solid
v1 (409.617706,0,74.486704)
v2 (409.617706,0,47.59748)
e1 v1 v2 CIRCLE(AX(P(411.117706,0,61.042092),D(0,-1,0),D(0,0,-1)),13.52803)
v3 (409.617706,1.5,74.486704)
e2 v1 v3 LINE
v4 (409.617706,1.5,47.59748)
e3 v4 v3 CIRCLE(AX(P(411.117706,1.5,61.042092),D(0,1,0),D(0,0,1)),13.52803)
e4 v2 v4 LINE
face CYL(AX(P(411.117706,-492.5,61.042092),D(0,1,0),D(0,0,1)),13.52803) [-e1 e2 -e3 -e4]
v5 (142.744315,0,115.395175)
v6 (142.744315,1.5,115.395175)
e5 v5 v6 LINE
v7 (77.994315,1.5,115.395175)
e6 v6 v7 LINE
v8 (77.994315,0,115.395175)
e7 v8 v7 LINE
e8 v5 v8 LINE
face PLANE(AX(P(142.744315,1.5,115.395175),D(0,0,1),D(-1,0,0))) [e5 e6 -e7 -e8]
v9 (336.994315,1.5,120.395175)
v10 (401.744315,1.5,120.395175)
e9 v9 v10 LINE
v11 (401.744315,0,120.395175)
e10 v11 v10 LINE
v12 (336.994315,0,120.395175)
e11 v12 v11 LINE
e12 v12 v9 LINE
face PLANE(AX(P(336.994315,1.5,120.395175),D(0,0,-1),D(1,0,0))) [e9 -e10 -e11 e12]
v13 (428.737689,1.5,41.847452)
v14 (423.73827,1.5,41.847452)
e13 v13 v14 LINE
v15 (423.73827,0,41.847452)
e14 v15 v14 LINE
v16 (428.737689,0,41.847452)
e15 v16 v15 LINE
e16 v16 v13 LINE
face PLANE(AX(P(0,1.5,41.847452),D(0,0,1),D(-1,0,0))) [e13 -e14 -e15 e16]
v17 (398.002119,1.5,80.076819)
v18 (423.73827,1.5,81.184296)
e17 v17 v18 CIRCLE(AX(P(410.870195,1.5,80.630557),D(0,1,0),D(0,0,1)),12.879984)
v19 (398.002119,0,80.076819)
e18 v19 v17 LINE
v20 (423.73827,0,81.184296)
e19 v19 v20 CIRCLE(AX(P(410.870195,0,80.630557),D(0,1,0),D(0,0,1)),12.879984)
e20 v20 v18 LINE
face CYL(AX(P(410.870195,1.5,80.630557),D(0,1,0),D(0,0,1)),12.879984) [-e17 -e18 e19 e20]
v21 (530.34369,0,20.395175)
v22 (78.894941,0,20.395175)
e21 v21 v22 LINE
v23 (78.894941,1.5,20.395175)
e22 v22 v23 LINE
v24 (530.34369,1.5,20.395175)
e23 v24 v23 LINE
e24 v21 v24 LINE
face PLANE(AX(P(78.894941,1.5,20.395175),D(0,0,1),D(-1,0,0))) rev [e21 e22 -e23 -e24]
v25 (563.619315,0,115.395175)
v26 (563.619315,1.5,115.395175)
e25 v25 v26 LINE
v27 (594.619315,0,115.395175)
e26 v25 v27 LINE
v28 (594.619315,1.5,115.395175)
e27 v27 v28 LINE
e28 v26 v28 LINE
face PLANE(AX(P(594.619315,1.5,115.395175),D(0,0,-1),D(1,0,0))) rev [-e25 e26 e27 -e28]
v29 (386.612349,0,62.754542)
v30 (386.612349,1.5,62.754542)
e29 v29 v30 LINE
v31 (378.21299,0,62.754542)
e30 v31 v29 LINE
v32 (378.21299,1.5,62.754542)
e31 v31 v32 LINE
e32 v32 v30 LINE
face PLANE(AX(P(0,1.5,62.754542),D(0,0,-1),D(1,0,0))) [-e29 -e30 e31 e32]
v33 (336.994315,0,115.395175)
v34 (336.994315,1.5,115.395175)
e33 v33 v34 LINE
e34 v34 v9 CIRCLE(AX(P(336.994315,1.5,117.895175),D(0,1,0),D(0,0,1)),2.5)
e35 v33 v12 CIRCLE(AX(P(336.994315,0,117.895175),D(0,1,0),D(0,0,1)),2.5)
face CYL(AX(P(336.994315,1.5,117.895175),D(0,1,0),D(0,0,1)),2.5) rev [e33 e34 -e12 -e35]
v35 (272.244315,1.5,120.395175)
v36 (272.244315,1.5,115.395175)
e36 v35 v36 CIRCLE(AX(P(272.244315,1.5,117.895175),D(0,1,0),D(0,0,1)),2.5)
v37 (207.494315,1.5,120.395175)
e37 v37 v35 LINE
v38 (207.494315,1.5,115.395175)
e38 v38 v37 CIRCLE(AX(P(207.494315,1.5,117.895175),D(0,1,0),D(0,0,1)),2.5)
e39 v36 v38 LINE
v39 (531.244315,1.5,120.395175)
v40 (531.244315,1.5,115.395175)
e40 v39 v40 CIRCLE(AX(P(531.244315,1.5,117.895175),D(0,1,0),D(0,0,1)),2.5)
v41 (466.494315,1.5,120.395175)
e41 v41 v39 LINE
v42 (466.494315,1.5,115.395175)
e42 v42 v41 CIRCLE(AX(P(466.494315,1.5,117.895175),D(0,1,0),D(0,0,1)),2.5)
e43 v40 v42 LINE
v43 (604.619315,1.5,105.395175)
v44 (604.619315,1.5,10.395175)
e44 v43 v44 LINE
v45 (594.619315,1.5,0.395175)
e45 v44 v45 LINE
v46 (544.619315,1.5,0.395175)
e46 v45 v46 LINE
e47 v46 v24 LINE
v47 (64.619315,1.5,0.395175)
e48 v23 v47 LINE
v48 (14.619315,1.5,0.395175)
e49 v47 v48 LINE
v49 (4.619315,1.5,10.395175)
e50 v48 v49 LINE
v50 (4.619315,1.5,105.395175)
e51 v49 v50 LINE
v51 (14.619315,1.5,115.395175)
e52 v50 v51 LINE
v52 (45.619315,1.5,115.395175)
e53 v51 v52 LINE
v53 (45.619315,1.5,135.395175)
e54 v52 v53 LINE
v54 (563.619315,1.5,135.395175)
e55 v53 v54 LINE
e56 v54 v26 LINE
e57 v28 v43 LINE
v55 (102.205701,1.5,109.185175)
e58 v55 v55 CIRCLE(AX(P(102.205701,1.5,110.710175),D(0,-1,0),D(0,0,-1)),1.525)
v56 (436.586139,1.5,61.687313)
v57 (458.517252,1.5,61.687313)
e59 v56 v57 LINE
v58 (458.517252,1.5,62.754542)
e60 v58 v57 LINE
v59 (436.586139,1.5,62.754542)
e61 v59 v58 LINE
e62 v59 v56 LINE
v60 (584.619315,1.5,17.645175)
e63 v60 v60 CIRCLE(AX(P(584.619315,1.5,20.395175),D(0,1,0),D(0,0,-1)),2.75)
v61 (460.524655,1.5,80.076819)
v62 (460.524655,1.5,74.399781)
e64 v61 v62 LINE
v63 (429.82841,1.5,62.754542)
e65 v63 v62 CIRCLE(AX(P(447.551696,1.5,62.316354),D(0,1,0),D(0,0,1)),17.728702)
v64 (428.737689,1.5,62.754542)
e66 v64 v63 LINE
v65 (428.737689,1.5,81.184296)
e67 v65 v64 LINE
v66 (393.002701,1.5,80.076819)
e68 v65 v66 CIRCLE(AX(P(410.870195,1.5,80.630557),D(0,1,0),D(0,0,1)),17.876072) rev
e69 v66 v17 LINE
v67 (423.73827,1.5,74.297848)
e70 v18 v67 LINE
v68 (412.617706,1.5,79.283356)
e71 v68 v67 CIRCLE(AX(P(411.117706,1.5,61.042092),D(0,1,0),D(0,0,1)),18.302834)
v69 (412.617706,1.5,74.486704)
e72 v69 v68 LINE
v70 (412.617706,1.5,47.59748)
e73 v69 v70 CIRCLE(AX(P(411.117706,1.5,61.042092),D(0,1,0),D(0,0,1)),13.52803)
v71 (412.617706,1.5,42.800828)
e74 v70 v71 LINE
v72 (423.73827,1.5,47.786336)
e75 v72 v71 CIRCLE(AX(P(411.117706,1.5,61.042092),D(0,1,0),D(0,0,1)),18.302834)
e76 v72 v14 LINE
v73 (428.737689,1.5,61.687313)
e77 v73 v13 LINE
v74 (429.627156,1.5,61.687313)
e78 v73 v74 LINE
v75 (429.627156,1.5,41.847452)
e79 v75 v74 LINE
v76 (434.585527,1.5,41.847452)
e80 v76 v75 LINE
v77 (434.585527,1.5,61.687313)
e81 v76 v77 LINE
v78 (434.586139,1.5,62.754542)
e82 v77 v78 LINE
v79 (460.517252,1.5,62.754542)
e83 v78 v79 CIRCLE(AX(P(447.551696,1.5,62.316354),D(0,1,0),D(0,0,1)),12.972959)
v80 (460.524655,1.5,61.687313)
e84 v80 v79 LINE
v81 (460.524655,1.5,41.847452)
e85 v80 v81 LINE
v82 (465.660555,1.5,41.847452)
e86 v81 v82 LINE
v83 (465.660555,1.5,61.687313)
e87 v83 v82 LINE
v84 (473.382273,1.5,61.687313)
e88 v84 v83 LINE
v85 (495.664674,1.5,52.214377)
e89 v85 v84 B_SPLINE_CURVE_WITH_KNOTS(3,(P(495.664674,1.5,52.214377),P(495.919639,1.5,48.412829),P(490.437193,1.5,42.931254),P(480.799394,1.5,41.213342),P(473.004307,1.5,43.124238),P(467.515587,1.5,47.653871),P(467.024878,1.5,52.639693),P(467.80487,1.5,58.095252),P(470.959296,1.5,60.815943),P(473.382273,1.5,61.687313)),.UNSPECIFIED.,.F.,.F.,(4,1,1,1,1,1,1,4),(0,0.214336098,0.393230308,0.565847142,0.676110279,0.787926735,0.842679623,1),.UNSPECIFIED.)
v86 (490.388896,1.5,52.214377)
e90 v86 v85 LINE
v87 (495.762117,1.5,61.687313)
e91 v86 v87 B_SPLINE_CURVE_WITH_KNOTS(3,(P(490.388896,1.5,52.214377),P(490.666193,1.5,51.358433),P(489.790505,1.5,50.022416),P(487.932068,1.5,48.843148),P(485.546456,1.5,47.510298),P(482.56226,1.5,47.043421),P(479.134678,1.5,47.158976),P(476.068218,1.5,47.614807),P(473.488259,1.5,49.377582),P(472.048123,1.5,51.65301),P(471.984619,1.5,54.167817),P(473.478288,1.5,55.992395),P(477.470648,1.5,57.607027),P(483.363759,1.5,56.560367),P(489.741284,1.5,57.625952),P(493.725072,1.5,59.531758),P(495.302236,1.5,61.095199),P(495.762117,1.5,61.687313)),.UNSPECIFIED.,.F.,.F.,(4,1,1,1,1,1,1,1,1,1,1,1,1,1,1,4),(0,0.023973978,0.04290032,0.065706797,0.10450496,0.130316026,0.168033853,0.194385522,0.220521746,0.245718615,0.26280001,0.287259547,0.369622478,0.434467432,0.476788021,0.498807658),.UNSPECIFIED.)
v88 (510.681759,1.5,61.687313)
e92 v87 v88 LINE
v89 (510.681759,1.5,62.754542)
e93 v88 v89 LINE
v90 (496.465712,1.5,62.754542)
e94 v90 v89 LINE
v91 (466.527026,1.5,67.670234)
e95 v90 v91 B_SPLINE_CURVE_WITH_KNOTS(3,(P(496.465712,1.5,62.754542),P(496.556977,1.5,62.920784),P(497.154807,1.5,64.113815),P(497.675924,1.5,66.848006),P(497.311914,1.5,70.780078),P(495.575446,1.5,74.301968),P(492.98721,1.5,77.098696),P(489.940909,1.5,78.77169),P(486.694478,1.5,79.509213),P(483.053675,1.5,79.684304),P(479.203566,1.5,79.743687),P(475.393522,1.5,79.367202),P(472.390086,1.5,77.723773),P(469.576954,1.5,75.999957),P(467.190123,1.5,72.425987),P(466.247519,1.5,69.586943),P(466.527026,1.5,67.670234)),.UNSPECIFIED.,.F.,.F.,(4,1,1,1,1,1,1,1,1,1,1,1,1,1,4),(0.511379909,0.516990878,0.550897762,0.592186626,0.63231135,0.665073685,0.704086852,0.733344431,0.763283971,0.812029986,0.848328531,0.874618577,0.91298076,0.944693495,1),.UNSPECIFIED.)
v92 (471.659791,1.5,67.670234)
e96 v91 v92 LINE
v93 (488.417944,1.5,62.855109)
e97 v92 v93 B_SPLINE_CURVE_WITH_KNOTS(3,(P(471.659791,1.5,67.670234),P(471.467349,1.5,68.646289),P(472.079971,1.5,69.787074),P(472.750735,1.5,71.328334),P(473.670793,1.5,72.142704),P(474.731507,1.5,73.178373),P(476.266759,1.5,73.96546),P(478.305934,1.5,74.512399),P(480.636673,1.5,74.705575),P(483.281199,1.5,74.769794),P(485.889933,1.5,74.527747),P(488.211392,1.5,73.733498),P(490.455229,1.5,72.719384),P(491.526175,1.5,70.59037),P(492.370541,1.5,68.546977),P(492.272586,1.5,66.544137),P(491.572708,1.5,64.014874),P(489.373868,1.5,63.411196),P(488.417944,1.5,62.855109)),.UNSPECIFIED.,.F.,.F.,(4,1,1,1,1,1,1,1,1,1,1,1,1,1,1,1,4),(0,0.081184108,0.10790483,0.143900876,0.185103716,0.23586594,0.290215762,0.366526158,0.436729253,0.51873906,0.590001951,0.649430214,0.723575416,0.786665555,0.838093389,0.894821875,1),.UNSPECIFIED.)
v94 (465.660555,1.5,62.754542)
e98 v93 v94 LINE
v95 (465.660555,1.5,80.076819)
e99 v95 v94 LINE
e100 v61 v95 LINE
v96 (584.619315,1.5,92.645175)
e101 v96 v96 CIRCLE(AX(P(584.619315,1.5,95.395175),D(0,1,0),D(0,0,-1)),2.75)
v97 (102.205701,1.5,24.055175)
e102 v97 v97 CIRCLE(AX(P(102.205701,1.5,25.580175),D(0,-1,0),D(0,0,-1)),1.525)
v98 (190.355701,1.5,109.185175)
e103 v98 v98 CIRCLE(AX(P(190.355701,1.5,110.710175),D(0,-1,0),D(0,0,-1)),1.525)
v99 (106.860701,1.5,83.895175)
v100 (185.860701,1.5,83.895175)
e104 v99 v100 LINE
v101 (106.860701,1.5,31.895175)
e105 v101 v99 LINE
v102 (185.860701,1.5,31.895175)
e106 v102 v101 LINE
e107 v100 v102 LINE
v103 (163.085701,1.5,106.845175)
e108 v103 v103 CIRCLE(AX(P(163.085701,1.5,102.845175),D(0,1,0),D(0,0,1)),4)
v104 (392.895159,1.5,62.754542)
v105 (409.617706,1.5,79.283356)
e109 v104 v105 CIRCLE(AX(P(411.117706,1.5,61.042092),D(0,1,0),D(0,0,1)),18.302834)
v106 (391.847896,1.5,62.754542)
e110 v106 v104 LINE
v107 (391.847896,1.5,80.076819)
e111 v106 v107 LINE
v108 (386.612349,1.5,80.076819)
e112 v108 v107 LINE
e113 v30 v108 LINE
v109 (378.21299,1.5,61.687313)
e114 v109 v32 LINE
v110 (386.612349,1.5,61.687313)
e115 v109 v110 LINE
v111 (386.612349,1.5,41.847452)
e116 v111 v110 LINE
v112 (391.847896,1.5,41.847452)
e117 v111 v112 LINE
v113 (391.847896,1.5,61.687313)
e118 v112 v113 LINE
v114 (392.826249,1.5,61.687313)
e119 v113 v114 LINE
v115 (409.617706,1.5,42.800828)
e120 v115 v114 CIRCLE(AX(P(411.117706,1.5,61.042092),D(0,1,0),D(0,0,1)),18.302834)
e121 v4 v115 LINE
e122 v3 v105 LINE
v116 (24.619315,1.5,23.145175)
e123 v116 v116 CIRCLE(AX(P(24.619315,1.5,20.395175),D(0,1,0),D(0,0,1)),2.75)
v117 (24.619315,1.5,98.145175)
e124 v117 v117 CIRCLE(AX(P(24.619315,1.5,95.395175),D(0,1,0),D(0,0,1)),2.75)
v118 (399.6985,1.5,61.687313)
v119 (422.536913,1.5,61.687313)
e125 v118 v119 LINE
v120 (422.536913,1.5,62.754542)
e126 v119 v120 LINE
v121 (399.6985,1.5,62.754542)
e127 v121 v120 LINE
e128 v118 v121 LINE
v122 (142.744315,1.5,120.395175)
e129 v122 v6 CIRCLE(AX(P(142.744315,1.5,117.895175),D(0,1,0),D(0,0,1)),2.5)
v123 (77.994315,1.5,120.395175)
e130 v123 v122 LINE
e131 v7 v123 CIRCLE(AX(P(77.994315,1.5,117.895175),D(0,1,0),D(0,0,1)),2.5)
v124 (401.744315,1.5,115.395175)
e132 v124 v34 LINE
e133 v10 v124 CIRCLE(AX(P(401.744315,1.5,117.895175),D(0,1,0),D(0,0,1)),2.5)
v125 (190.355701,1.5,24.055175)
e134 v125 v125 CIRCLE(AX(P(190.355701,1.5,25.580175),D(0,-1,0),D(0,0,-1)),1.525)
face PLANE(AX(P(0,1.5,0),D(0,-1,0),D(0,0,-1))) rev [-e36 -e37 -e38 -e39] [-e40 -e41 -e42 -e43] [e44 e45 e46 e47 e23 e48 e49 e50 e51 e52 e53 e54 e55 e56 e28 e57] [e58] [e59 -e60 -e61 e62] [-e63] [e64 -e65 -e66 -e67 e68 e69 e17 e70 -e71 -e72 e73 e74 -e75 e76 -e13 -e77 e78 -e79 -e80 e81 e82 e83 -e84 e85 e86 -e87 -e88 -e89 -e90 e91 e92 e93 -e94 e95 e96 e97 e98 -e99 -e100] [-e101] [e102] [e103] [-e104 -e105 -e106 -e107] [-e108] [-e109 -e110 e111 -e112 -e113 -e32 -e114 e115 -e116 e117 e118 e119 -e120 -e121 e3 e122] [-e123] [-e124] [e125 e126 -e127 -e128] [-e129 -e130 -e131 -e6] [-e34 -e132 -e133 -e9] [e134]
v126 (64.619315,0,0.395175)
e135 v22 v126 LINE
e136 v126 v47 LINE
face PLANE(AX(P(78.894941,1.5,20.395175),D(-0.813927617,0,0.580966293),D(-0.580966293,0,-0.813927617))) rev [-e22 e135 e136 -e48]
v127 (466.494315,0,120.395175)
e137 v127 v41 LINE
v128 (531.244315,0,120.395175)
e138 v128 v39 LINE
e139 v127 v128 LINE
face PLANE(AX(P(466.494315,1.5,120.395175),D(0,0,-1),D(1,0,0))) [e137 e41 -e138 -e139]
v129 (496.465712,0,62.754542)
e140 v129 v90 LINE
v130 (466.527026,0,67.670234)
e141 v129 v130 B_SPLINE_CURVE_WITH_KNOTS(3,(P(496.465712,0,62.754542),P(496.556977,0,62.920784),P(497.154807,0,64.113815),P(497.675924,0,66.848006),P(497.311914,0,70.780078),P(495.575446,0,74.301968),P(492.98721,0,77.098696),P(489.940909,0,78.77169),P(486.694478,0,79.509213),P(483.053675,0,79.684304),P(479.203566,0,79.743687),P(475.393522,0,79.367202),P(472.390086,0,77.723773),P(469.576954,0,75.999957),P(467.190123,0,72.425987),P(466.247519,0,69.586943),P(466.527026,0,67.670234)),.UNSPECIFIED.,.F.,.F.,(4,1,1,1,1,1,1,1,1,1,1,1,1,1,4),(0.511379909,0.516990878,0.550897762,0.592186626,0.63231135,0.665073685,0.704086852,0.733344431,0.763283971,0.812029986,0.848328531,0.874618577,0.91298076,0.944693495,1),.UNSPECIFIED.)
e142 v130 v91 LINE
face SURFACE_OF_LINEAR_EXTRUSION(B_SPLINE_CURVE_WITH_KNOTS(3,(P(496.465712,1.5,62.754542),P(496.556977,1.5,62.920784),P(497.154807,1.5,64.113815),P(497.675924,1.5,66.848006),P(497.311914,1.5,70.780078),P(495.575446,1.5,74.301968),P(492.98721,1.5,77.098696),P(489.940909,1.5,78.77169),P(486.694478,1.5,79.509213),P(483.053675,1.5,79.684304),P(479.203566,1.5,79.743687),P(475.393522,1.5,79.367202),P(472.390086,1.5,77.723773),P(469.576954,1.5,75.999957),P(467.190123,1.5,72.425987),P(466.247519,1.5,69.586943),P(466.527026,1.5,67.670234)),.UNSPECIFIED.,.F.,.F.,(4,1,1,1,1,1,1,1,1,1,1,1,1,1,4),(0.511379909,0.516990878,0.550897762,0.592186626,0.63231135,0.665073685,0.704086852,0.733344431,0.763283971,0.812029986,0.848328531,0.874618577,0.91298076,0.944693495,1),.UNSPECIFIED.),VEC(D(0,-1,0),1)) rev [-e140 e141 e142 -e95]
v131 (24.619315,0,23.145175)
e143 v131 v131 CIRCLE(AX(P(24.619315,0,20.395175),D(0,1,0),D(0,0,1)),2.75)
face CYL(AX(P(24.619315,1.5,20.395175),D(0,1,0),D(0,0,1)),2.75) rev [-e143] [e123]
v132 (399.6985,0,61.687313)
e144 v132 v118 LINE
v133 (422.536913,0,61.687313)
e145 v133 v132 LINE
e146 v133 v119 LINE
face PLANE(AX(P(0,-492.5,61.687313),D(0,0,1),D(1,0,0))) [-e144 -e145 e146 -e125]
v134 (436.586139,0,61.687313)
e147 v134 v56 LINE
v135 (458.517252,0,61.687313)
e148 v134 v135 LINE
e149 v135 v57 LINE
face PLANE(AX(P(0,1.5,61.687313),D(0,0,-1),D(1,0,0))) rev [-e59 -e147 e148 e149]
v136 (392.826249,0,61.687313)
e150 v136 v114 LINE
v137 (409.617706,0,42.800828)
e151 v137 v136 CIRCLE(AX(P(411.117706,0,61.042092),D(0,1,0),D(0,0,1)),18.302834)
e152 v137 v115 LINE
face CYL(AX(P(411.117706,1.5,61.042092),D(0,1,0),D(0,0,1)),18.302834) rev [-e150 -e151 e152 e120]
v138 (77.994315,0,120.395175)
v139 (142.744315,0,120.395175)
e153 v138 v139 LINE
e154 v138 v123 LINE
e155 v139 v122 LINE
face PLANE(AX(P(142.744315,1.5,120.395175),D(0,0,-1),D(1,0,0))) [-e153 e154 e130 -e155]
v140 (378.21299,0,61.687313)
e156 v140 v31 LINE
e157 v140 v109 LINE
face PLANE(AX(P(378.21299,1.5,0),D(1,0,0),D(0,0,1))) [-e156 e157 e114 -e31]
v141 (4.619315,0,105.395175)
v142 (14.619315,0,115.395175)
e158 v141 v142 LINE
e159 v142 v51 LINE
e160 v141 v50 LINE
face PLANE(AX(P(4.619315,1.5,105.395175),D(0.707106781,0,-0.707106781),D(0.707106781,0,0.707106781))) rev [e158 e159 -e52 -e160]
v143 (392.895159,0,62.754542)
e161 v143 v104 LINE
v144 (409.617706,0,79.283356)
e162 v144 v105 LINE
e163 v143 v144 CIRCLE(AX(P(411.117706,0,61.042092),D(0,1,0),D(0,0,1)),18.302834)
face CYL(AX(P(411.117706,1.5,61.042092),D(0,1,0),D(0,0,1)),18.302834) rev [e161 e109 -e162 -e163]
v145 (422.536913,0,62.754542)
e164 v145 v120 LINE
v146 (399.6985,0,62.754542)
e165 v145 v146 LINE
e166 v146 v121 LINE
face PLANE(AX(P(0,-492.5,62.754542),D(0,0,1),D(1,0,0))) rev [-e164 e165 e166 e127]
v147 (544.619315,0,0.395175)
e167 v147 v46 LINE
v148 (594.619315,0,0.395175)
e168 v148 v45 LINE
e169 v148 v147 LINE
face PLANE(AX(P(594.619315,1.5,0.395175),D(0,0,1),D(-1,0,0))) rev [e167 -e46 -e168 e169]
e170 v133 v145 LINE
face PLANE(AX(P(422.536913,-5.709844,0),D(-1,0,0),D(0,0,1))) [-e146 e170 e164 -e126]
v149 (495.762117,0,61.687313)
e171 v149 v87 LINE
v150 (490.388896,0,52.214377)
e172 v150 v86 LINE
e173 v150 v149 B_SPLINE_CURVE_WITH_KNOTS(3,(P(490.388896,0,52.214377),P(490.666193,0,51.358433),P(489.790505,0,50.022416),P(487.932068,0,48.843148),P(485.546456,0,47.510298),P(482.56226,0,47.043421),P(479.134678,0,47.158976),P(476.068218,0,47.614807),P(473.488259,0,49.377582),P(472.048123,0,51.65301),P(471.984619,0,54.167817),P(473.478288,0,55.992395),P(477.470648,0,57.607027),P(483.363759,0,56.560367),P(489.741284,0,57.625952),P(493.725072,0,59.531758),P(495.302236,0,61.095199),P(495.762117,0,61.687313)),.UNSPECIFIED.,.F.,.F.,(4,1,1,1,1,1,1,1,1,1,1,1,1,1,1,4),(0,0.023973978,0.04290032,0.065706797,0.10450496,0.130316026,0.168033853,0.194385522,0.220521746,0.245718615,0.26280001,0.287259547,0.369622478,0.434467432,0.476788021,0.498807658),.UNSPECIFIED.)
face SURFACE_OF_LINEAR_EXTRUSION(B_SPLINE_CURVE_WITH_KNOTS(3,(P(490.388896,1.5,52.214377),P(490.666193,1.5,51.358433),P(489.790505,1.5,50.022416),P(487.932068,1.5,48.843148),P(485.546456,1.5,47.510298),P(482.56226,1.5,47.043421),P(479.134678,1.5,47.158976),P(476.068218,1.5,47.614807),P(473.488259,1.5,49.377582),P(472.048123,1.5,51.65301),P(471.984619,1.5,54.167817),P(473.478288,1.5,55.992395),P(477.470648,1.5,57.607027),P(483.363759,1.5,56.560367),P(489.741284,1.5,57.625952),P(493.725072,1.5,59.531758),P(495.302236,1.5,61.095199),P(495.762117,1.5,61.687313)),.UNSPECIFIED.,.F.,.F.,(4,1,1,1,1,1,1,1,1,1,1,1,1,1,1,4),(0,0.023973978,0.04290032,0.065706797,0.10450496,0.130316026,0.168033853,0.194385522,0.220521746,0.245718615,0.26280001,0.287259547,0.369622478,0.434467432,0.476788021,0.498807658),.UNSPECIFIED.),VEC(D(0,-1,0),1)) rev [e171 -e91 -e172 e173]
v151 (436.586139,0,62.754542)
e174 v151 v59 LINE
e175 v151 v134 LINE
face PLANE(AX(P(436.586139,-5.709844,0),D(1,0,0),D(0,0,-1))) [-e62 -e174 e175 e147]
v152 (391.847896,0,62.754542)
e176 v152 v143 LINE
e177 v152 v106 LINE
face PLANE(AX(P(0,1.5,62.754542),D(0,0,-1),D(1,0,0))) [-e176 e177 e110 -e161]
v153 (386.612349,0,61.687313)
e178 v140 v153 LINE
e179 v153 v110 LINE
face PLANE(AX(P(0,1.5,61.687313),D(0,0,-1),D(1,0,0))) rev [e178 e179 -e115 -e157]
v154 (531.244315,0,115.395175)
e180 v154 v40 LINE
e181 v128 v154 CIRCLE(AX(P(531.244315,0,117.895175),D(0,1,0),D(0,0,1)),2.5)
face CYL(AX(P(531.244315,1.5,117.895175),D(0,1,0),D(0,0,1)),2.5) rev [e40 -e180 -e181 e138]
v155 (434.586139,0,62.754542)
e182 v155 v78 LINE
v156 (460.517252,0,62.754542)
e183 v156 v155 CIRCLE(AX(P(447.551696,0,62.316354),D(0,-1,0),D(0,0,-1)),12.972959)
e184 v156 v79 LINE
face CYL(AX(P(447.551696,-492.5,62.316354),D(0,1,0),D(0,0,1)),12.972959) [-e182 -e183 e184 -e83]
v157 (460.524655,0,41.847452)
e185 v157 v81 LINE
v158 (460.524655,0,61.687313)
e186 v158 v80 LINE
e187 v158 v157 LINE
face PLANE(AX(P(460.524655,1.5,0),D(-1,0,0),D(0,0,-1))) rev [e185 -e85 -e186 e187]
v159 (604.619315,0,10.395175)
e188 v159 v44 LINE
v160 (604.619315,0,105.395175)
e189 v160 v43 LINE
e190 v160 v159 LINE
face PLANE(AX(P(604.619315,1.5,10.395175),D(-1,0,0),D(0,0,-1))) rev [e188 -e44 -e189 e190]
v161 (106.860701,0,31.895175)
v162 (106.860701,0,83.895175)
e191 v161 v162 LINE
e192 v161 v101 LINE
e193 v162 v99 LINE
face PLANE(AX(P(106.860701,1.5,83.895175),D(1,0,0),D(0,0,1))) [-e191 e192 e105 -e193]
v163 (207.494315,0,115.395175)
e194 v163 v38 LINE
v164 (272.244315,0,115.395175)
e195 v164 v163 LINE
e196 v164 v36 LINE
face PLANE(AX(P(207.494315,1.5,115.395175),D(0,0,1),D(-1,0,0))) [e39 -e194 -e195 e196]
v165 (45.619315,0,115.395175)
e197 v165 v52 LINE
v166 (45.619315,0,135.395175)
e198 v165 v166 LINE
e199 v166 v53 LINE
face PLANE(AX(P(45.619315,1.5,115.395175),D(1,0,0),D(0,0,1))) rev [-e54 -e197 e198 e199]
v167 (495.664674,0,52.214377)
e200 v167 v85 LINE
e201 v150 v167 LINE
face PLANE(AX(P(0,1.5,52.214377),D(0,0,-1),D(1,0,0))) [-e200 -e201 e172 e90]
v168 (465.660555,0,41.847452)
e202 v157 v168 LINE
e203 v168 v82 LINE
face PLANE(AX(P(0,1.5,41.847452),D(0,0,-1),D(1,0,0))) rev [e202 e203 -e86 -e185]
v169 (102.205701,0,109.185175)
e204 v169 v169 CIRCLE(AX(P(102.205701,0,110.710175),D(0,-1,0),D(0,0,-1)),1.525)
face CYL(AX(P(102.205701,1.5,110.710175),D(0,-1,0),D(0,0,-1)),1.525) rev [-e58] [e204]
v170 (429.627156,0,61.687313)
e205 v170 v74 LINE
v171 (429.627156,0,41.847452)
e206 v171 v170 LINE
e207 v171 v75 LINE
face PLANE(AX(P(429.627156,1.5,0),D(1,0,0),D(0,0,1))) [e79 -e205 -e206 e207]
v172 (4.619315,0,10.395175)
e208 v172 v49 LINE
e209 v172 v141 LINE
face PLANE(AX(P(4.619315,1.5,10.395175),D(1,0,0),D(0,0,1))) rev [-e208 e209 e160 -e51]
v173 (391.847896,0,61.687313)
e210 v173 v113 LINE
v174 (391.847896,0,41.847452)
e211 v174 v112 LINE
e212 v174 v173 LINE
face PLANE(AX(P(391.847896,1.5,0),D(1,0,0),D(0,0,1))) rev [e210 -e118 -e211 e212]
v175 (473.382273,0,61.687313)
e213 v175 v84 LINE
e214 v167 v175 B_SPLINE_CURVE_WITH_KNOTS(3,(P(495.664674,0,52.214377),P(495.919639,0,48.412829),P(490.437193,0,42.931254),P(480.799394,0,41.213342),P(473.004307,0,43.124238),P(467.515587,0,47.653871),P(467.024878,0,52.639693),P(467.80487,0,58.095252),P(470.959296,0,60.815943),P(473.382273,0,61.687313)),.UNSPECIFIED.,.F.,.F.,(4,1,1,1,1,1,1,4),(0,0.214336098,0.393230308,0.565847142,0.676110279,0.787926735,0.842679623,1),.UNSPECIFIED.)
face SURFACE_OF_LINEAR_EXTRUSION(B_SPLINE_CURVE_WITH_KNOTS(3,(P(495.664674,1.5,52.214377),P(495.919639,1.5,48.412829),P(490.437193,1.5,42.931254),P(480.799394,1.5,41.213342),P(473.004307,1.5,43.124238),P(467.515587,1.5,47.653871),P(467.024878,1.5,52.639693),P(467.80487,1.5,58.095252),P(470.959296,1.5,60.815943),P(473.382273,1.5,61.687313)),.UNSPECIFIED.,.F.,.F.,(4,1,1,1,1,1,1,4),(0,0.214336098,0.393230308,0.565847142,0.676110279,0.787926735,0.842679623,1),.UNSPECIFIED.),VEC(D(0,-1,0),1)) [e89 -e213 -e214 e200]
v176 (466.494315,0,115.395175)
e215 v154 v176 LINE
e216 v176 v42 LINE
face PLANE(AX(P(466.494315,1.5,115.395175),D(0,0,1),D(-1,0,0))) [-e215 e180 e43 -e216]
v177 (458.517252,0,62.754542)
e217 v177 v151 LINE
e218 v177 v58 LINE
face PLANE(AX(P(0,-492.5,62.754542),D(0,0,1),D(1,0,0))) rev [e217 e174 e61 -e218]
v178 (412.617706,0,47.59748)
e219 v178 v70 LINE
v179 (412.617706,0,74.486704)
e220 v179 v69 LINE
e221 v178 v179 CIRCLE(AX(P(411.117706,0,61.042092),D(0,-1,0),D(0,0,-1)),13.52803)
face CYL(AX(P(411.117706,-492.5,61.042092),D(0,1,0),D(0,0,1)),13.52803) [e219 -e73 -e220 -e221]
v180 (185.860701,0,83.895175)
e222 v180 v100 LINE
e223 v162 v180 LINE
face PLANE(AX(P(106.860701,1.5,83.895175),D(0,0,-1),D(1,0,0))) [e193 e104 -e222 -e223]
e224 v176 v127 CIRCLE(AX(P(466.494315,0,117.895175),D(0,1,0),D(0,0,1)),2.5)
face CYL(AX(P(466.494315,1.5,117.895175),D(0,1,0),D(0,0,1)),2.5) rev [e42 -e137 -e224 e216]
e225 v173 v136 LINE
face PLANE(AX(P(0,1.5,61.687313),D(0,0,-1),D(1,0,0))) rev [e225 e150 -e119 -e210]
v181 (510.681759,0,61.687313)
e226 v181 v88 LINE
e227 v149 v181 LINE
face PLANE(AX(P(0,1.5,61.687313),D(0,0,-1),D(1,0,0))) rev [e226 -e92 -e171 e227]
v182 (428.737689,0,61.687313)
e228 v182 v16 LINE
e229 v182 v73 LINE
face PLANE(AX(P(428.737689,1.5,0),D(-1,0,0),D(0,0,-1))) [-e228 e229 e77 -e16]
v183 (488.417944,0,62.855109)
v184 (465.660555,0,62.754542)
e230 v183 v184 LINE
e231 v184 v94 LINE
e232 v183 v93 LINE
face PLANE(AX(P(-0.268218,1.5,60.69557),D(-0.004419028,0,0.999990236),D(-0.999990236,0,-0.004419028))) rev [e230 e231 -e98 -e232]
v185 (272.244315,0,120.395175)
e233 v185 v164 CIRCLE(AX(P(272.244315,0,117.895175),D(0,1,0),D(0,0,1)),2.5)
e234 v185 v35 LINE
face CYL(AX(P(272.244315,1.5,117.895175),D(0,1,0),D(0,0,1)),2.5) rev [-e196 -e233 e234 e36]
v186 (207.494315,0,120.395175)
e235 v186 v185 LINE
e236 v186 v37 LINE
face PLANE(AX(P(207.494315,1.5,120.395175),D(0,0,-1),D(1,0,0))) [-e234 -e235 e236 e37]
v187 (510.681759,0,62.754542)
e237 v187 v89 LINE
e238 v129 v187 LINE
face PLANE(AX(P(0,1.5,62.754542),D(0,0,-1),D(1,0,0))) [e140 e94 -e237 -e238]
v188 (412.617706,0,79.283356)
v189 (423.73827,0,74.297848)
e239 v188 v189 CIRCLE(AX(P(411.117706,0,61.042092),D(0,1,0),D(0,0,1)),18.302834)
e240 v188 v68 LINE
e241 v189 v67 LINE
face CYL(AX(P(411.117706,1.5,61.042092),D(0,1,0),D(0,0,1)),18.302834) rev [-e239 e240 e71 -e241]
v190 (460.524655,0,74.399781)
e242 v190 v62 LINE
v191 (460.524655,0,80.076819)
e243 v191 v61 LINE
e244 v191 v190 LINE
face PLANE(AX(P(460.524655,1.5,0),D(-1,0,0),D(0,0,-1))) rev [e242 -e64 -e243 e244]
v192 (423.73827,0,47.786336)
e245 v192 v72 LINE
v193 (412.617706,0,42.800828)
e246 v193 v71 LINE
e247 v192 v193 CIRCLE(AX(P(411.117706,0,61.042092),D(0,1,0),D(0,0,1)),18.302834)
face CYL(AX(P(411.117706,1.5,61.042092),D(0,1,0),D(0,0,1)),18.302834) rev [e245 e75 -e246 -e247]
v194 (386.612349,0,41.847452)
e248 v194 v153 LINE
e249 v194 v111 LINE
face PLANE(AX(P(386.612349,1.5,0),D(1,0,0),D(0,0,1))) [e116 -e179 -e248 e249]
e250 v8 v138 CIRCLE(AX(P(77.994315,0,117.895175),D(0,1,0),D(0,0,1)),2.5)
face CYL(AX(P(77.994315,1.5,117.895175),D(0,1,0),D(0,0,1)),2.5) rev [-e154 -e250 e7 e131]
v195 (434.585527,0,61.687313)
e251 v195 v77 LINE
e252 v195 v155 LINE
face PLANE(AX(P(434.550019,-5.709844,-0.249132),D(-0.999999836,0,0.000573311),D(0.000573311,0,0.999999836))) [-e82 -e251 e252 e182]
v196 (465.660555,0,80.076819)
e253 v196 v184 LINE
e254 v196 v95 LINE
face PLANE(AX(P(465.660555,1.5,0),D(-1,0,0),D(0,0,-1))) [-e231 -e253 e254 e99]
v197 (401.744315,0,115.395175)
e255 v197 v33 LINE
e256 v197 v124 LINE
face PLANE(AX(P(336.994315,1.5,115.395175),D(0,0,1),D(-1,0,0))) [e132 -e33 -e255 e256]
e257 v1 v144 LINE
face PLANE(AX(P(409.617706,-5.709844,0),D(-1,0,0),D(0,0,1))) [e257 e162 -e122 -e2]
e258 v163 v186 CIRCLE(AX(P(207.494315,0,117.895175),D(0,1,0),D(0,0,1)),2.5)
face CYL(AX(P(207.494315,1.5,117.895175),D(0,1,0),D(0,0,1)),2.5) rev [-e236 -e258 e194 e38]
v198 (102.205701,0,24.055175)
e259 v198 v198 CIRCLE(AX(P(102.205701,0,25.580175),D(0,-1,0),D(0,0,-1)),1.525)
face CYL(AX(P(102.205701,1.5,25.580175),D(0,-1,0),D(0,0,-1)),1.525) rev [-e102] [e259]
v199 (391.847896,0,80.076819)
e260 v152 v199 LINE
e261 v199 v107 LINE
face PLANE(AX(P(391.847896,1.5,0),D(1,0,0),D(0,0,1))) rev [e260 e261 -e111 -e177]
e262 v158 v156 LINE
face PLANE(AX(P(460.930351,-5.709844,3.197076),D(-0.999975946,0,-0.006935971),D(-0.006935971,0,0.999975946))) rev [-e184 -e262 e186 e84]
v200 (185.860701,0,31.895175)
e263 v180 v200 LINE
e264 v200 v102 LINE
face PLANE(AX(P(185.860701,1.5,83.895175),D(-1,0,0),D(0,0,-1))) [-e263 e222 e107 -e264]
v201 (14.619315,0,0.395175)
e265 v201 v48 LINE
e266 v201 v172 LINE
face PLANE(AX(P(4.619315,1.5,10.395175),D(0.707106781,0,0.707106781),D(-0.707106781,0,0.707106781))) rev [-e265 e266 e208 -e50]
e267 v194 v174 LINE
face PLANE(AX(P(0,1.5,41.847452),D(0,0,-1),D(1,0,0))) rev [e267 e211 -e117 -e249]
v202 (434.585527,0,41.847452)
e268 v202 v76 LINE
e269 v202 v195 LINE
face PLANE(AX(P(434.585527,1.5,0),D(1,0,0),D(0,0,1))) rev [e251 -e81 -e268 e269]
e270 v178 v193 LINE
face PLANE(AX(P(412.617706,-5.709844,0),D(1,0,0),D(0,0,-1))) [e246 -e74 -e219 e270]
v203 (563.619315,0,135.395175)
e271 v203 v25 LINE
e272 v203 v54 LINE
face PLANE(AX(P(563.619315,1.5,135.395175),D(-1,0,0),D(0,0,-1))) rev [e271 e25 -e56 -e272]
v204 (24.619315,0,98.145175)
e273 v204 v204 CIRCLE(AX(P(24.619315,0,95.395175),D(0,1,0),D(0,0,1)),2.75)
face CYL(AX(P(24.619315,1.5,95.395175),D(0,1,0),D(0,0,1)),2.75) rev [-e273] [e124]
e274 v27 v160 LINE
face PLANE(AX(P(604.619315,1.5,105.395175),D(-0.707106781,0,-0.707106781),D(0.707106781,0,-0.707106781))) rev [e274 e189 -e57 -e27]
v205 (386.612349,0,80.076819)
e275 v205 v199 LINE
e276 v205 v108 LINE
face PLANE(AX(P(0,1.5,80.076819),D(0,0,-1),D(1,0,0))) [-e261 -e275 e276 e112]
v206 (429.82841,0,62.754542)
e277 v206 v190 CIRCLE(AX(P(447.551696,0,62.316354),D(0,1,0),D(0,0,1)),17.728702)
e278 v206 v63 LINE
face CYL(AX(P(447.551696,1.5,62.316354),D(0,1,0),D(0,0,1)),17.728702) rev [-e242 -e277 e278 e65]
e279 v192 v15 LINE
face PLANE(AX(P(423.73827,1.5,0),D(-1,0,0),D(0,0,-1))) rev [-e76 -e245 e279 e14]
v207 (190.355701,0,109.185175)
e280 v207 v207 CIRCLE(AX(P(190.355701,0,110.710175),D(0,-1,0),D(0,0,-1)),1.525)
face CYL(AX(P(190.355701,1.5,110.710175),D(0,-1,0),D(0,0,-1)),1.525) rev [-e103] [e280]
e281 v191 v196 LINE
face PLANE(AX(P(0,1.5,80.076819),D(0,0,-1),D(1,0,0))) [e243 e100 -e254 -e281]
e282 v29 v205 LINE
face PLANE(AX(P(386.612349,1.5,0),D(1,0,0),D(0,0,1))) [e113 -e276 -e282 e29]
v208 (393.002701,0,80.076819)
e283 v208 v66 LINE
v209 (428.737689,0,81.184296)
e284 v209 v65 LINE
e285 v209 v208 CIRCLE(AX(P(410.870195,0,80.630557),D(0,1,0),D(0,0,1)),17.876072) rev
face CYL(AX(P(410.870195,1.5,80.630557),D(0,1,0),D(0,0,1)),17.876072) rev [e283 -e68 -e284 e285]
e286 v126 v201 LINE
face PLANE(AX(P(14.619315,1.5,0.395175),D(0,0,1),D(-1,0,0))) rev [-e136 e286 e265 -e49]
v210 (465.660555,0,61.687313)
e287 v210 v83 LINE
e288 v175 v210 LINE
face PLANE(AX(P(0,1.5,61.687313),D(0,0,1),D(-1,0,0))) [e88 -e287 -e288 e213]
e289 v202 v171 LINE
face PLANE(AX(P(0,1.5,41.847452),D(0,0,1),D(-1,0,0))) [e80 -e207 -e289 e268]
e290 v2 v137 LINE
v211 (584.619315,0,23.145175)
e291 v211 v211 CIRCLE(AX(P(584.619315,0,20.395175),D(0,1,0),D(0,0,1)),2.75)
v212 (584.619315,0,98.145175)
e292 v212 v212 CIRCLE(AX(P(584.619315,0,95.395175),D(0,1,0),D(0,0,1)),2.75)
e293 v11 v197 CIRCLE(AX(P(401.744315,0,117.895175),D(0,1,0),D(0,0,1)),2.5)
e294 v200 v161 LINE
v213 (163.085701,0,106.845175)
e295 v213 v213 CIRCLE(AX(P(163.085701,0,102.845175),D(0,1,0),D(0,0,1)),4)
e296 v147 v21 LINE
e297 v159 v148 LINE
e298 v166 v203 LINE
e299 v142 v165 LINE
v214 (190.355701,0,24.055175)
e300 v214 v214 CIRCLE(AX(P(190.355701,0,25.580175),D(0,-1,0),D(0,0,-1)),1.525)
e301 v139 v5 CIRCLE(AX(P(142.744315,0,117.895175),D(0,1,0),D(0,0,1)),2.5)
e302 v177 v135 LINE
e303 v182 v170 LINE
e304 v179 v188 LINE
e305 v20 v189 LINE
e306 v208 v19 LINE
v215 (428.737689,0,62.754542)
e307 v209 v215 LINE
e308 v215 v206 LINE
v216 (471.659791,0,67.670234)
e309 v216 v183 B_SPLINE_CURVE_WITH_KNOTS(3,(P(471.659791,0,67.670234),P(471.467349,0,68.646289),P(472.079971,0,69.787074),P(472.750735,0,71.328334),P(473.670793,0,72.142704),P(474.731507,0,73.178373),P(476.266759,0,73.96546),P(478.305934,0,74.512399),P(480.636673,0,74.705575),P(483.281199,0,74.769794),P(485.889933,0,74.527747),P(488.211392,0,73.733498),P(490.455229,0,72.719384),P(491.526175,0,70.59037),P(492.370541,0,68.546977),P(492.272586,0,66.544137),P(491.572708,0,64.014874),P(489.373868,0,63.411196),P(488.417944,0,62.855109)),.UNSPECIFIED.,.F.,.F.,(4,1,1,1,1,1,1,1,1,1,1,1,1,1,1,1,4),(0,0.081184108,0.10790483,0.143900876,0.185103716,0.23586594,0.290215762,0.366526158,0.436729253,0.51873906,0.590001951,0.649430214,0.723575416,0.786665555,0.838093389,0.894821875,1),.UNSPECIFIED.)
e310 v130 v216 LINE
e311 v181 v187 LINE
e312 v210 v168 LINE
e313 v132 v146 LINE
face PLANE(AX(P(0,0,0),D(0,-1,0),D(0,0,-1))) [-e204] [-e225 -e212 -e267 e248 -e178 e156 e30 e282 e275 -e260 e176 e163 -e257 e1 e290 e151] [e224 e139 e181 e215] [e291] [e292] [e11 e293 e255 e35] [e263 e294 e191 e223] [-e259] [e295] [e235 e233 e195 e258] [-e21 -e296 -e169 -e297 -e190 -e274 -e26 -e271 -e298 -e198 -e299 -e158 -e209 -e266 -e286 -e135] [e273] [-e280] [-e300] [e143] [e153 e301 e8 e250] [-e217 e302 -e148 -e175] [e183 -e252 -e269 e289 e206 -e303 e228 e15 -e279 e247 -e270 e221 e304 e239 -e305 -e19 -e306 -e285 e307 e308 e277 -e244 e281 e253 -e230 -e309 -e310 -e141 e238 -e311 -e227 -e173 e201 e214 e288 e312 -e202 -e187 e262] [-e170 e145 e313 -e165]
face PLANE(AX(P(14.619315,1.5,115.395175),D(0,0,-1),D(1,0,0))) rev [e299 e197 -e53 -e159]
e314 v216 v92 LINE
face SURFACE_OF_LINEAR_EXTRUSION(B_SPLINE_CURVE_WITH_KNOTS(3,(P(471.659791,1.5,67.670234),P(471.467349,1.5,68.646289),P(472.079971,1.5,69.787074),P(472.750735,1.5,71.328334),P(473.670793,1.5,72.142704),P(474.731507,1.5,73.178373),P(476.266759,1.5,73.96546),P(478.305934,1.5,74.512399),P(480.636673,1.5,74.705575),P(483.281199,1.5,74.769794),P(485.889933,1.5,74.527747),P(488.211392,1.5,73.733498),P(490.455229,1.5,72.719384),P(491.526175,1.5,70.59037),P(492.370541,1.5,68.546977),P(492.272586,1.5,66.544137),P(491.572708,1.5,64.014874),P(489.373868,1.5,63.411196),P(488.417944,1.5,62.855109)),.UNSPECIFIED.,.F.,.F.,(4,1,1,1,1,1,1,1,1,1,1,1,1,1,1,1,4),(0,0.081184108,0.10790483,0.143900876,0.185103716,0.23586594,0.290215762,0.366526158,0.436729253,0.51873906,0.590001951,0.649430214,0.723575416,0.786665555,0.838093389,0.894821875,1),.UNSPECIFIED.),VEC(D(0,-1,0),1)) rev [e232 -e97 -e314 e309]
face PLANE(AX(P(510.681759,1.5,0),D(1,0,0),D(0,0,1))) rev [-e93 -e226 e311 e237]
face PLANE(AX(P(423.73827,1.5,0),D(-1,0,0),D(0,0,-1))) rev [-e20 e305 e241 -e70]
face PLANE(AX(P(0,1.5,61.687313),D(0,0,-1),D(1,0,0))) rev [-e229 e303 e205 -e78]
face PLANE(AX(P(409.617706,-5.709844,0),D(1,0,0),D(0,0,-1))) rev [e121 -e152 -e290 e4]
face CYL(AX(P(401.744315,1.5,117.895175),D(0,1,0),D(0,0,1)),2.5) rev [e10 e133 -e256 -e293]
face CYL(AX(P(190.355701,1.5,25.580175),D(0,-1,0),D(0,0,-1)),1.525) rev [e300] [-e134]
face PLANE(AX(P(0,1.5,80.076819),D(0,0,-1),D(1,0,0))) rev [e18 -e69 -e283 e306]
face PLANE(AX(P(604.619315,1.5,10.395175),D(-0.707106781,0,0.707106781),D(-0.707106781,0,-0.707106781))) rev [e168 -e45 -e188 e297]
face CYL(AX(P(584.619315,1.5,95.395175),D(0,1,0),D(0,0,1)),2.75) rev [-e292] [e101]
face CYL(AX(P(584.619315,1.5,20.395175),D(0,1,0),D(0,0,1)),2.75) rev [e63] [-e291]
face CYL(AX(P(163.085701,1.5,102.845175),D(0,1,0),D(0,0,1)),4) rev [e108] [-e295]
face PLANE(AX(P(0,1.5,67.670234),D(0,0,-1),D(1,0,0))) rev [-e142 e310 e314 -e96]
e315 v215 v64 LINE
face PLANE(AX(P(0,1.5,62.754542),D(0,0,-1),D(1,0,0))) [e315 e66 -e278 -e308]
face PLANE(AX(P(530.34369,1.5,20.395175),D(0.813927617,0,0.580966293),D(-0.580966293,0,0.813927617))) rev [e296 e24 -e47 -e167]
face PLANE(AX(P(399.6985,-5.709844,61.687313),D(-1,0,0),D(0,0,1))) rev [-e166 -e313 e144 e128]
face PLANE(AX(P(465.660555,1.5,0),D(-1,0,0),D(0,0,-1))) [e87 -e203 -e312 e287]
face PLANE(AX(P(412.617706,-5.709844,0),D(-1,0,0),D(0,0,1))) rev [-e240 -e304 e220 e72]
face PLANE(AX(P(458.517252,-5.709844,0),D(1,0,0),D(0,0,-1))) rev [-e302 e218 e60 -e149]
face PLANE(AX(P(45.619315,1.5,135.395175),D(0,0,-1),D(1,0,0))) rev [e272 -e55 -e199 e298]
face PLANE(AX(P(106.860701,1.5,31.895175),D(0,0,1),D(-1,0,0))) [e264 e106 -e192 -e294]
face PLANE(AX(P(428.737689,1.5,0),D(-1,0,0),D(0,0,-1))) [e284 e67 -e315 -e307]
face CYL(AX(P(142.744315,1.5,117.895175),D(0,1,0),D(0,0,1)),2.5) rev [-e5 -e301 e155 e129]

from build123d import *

# Parameters (mm, degrees)
SKETCH1_R           = 2.75
BOSS_EXTRUDE1_DEPTH = 1.5
CUT_EXTRUDE1_DEPTH  = 494
SKETCH3_W           = 79
SKETCH3_H           = 52
CUT_EXTRUDE2_DEPTH  = 10
SKETCH7_R           = 4
CUT_EXTRUDE4_DEPTH  = 10
SKETCH8_R           = 1.525
CUT_EXTRUDE5_DEPTH  = 10
BOSS_EXTRUDE2_DEPTH = 1.5


with BuildPart() as part:
    # Sketch1 → Boss-Extrude1 (new body)
    with BuildSketch(Plane(origin=(0, 0, 0), x_dir=(1, 0, 0), z_dir=(0, 1, 0))):
        Polygon((14.619315376, -0.395174927), (64.619315376, -0.395174927), (78.894940901, -20.395174927), (530.343689851, -20.395174927), (544.619315376, -0.395174927), (594.619315376, -0.395174927), (604.619315376, -10.395174927), (604.619315376, -105.395174927), (594.619315376, -115.395174927), (563.619315376, -115.395174927), (563.619315376, -135.395174927), (45.619315376, -135.395174927), (45.619315376, -115.395174927), (14.619315376, -115.395174927), (4.619315376, -105.395174927), (4.619315376, -10.395174927), align=None)
        with Locations(Location((24.619315376, -20.395174927, 0), (0, 0, 270))):
            Circle(SKETCH1_R, mode=Mode.SUBTRACT)
        with Locations(Location((24.619315376, -95.395174927, 0), (0, 0, 270))):
            Circle(SKETCH1_R, mode=Mode.SUBTRACT)
        with Locations(Location((584.619315376, -95.395174927, 0), (0, 0, 90))):
            Circle(SKETCH1_R, mode=Mode.SUBTRACT)
        with Locations(Location((584.619315376, -20.395174927, 0), (0, 0, 90))):
            Circle(SKETCH1_R, mode=Mode.SUBTRACT)
        with BuildLine():
            Line((142.744315376, -120.395174927), (77.994315376, -120.395174927))
            ThreePointArc((77.994315376, -120.395174927), (75.494315376, -117.895174927), (77.994315376, -115.395174927))
            Line((77.994315376, -115.395174927), (142.744315376, -115.395174927))
            ThreePointArc((142.744315376, -115.395174927), (145.244315376, -117.895174927), (142.744315376, -120.395174927))
        make_face(mode=Mode.SUBTRACT)
        with BuildLine():
            Line((466.494315376, -115.395174927), (531.244315376, -115.395174927))
            ThreePointArc((531.244315376, -115.395174927), (533.744315376, -117.895174927), (531.244315376, -120.395174927))
            Line((531.244315376, -120.395174927), (466.494315376, -120.395174927))
            ThreePointArc((466.494315376, -120.395174927), (463.994315376, -117.895174927), (466.494315376, -115.395174927))
        make_face(mode=Mode.SUBTRACT)
        with BuildLine():
            Line((336.994315376, -115.395174927), (401.744315376, -115.395174927))
            ThreePointArc((401.744315376, -115.395174927), (404.244315376, -117.895174927), (401.744315376, -120.395174927))
            Line((401.744315376, -120.395174927), (336.994315376, -120.395174927))
            ThreePointArc((336.994315376, -120.395174927), (334.494315376, -117.895174927), (336.994315376, -115.395174927))
        make_face(mode=Mode.SUBTRACT)
        with BuildLine():
            Line((207.494315376, -115.395174927), (272.244315376, -115.395174927))
            ThreePointArc((272.244315376, -115.395174927), (274.744315376, -117.895174927), (272.244315376, -120.395174927))
            Line((272.244315376, -120.395174927), (207.494315376, -120.395174927))
            ThreePointArc((207.494315376, -120.395174927), (204.994315376, -117.895174927), (207.494315376, -115.395174927))
        make_face(mode=Mode.SUBTRACT)
    extrude(amount=BOSS_EXTRUDE1_DEPTH)

    # Sketch2 → Cut-Extrude1 (cut)
    # profile 1 of 2: a face of its own
    with BuildSketch(Plane(origin=(0, 1.5, 0), x_dir=(1, 0, 0), z_dir=(0, 1, 0))):
        with BuildLine():
            Line((391.847895604, -62.754542196), (392.8951588, -62.754542196))
            ThreePointArc((392.8951588, -62.754542196), (404.702292582, -78.183742443), (423.738270438, -74.297848013))
            Line((423.738270438, -74.297848013), (423.738270438, -81.184295825))
            ThreePointArc((423.738270438, -81.184295825), (410.316456421, -93.498633134), (398.002119112, -80.076819118))
            Line((398.002119112, -80.076819118), (393.00270081, -80.076819118))
            ThreePointArc((393.00270081, -80.076819118), (410.316456421, -98.498051436), (428.73768874, -81.184295825))
            Line((428.73768874, -81.184295825), (428.73768874, -41.8474518))
            Line((428.73768874, -41.8474518), (423.738270438, -41.8474518))
            Line((423.738270438, -41.8474518), (423.738270438, -47.786335651))
            ThreePointArc((423.738270438, -47.786335651), (403.611105615, -44.349438795), (392.826248922, -61.687313229))
            Line((392.826248922, -61.687313229), (391.847895604, -61.687313229))
            Line((391.847895604, -61.687313229), (391.847895604, -41.847451799))
            Line((391.847895604, -41.847451799), (386.612349176, -41.847451799))
            Line((386.612349176, -41.847451799), (386.612349176, -61.687313229))
            Line((386.612349176, -61.687313229), (378.212990315, -61.687313229))
            Line((378.212990315, -61.687313229), (378.212990315, -62.754542196))
            Line((378.212990315, -62.754542196), (386.612349176, -62.754542196))
            Line((386.612349176, -62.754542196), (386.612349176, -80.076819118))
            Line((386.612349176, -80.076819118), (391.847895604, -80.076819118))
            Line((391.847895604, -80.076819118), (391.847895604, -62.754542196))
        make_face()
        with BuildLine():
            ThreePointArc((424.630340047, -61.687313229), (411.117706096, -47.514062156), (397.605072146, -61.687313229))
            Line((397.605072146, -61.687313229), (424.630340047, -61.687313229))
        make_face(mode=Mode.SUBTRACT)
        with BuildLine():
            ThreePointArc((397.698499686, -62.754542196), (411.117706096, -74.570121508), (424.536912506, -62.754542196))
            Line((424.536912506, -62.754542196), (397.698499686, -62.754542196))
        make_face(mode=Mode.SUBTRACT)
    # profile 2 of 2: a face of its own
    with BuildSketch(Plane(origin=(0, 1.5, 0), x_dir=(1, 0, 0), z_dir=(0, 1, 0))):
        with BuildLine():
            Line((428.73768874, -61.687313229), (428.73768874, -62.754542196))
            Line((428.73768874, -62.754542196), (429.828410223, -62.754542196))
            ThreePointArc((429.828410223, -62.754542196), (441.263270171, -78.892317867), (460.524654776, -74.399780865))
            Line((460.524654776, -74.399780865), (460.524654776, -80.076819118))
            Line((460.524654776, -80.076819118), (465.660554794, -80.076819118))
            Line((465.660554794, -80.076819118), (465.660554794, -62.754542196))
            Line((465.660554794, -62.754542196), (488.417944181, -62.855108717))
            add(Edge.make_bspline(
                [(471.65979143, -67.670234055), (471.467349037, -68.646289122), (472.079971263, -69.787073511), (472.75073467, -71.328334093), (473.670793108, -72.142703983), (474.731506552, -73.17837262), (476.26675861, -73.965460053), (478.30593381, -74.512399305), (480.63667293, -74.705574625), (483.281199386, -74.769793815), (485.889933101, -74.527747245), (488.211391914, -73.733498343), (490.455228526, -72.719383895), (491.526175492, -70.590370359), (492.370540737, -68.546977205), (492.272585959, -66.544136837), (491.572707864, -64.014873745), (489.373868115, -63.411195717), (488.417944181, -62.855108717)],
                knots=[0, 0, 0, 0, 0.081184108, 0.10790483, 0.143900876, 0.185103716, 0.23586594, 0.290215762, 0.366526158, 0.436729253, 0.51873906, 0.590001951, 0.649430214, 0.723575416, 0.786665555, 0.838093389, 0.894821875, 1, 1, 1, 1], degree=3))
            Line((471.65979143, -67.670234055), (466.527025714, -67.670234055))
            add(Edge.make_bspline(
                [(496.465712365, -62.754542196), (496.556977024, -62.920783862), (497.154806756, -64.113814796), (497.675924436, -66.848005681), (497.311914035, -70.780078344), (495.575446493, -74.301968213), (492.98720979, -77.098696092), (489.940908772, -78.771690205), (486.694478373, -79.50921288), (483.053674793, -79.684304385), (479.203565525, -79.74368695), (475.393522247, -79.36720183), (472.390086365, -77.723772723), (469.576953675, -75.999956627), (467.190123208, -72.425986535), (466.247518724, -69.586943049), (466.527025714, -67.670234055)],
                knots=[0.511379909, 0.511379909, 0.511379909, 0.511379909, 0.516990878, 0.550897762, 0.592186626, 0.63231135, 0.665073685, 0.704086852, 0.733344431, 0.763283971, 0.812029986, 0.848328531, 0.874618577, 0.91298076, 0.944693495, 1, 1, 1, 1], degree=3))
            Line((496.465712365, -62.754542196), (510.681758941, -62.754542196))
            Line((510.681758941, -62.754542196), (510.681758941, -61.687313229))
            Line((510.681758941, -61.687313229), (495.762116862, -61.687313229))
            add(Edge.make_bspline(
                [(490.38889617, -52.214376993), (490.666192943, -51.358432785), (489.79050483, -50.022415821), (487.932067858, -48.843148452), (485.54645635, -47.510297539), (482.562260426, -47.043421476), (479.134677609, -47.158975955), (476.068218203, -47.614807116), (473.488258648, -49.377581885), (472.04812259, -51.653010333), (471.984618877, -54.16781745), (473.478287973, -55.992395301), (477.47064832, -57.607026677), (483.363758542, -56.560367271), (489.741283998, -57.625951926), (493.725072166, -59.531757921), (495.302235724, -61.095199397), (495.762116862, -61.687313229)],
                knots=[0, 0, 0, 0, 0.023973978, 0.04290032, 0.065706797, 0.10450496, 0.130316026, 0.168033853, 0.194385522, 0.220521746, 0.245718615, 0.26280001, 0.287259547, 0.369622478, 0.434467432, 0.476788021, 0.498807658, 0.498807658, 0.498807658, 0.498807658], degree=3))
            Line((490.38889617, -52.214376993), (495.664673576, -52.214376993))
            add(Edge.make_bspline(
                [(495.664673576, -52.214376993), (495.919639332, -48.412828628), (490.437193219, -42.931253515), (480.799393591, -41.213342373), (473.004306785, -43.124237957), (467.515587473, -47.653871227), (467.024877851, -52.639692563), (467.80487049, -58.095251596), (470.959295633, -60.815942731), (473.382272533, -61.687313229)],
                knots=[0, 0, 0, 0, 0.214336098, 0.393230308, 0.565847142, 0.676110279, 0.787926735, 0.842679623, 1, 1, 1, 1], degree=3))
            Line((473.382272533, -61.687313229), (465.660554794, -61.687313229))
            Line((465.660554794, -61.687313229), (465.660554794, -41.847451799))
            Line((465.660554794, -41.847451799), (460.524654776, -41.847451799))
            Line((460.524654776, -41.847451799), (460.524654776, -61.687313229))
            Line((460.524654776, -61.687313229), (434.585527347, -61.687313229))
            Line((434.585527347, -61.687313229), (434.585527347, -41.8474518))
            Line((434.585527347, -41.8474518), (429.6271558, -41.8474518))
            Line((429.6271558, -41.8474518), (429.6271558, -61.687313229))
            Line((429.6271558, -61.687313229), (428.73768874, -61.687313229))
        make_face()
        with BuildLine():
            ThreePointArc((460.51725233, -62.754542196), (447.551695765, -75.289313484), (434.586139201, -62.754542196))
            Line((434.586139201, -62.754542196), (460.51725233, -62.754542196))
        make_face(mode=Mode.SUBTRACT)
    extrude(amount=-CUT_EXTRUDE1_DEPTH, mode=Mode.SUBTRACT)


with BuildPart() as cut_extrude1_piece_1:
    # of the separate pieces the step leaves, piece 1, a body of its own (cut_extrude1_pieces)
    add(part.part.solids().sort_by_distance((14.619315376, 0, 0.395174927))[0])

    # Sketch3 → Cut-Extrude2 (cut)
    with BuildSketch(Plane(origin=(0, 1.5, 0), x_dir=(1, 0, 0), z_dir=(0, 1, 0))):
        with Locations((146.360700612, -57.895174927)):
            Rectangle(SKETCH3_W, SKETCH3_H)
    extrude(amount=-CUT_EXTRUDE2_DEPTH, mode=Mode.SUBTRACT)

    # Sketch7 → Cut-Extrude4 (cut)
    with BuildSketch(Plane(origin=(0, 1.5, 0), x_dir=(1, 0, 0), z_dir=(0, 1, 0))):
        with Locations(Location((163.085700612, -102.845174927, 0), (0, 0, 270))):
            Circle(SKETCH7_R)
    extrude(amount=-CUT_EXTRUDE4_DEPTH, mode=Mode.SUBTRACT)

    # Sketch8 → Cut-Extrude5 (cut)
    with BuildSketch(Plane(origin=(0, 0, 0), x_dir=(-1, 0, 0), z_dir=(0, -1, 0))):
        with Locations(Location((-190.355700612, -25.580174927, 0), (0, 0, 90))):
            Circle(SKETCH8_R)
        with Locations(Location((-102.205700612, -25.580174927, 0), (0, 0, 90))):
            Circle(SKETCH8_R)
        with Locations(Location((-102.205700612, -110.710174927, 0), (0, 0, 90))):
            Circle(SKETCH8_R)
        with Locations(Location((-190.355700612, -110.710174927, 0), (0, 0, 90))):
            Circle(SKETCH8_R)
    extrude(amount=-CUT_EXTRUDE5_DEPTH, mode=Mode.SUBTRACT)



with BuildPart() as cut_extrude1_piece_2:
    # of the separate pieces the step leaves, piece 2, a body of its own (cut_extrude1_pieces)
    add(part.part.solids().sort_by_distance((424.630340047, 0, 61.687313229))[0])


with BuildPart() as cut_extrude1_piece_3:
    # of the separate pieces the step leaves, piece 3, a body of its own (cut_extrude1_pieces)
    add(part.part.solids().sort_by_distance((434.586139201, 0, 62.754542196))[0])


with BuildPart() as cut_extrude1_piece_4:
    # of the separate pieces the step leaves, piece 4, a body of its own (cut_extrude1_pieces)
    add(part.part.solids().sort_by_distance((397.698499686, 0, 62.754542196))[0])


with BuildPart() as cut_extrude1_piece_1_1:
    add(cut_extrude1_piece_1.part)

    add(cut_extrude1_piece_2.part)  # Boss-Extrude2 merges Cut-Extrude1 piece 2

    add(cut_extrude1_piece_3.part)  # Boss-Extrude2 merges Cut-Extrude1 piece 3

    add(cut_extrude1_piece_4.part)  # Boss-Extrude2 merges Cut-Extrude1 piece 4
    # Sketch9 → Boss-Extrude2 (add)
    with BuildSketch(Plane(origin=(0, 1.5, 0), x_dir=(1, 0, 0), z_dir=(0, 1, 0))):
        with BuildLine():
            Line((409.617706096, -42.800827725), (409.617706096, -47.597480015))
            ThreePointArc((409.617706096, -47.597480015), (411.117706096, -47.514062156), (412.617706096, -47.597480015))
            Line((412.617706096, -47.597480015), (412.617706096, -42.800827725))
            ThreePointArc((412.617706096, -42.800827725), (411.117706096, -42.739258275), (409.617706096, -42.800827725))
        make_face()
        with BuildLine():
            Line((422.536912506, -62.754542196), (424.536912506, -62.754542196))
            ThreePointArc((424.536912506, -62.754542196), (424.594194909, -62.221852914), (424.630340047, -61.687313229))
            Line((424.630340047, -61.687313229), (422.536912506, -61.687313229))
            Line((422.536912506, -61.687313229), (422.536912506, -62.754542196))
        make_face()
        Polygon((436.586139201, -62.754542196), (436.586139201, -61.687313229), (434.585527347, -61.687313229), (434.586139201, -62.754542196), align=None)
        Polygon((458.51725233, -61.687313229), (460.524654776, -61.687313229), (460.51725233, -62.754542196), (458.51725233, -62.754542196), align=None)
        with BuildLine():
            ThreePointArc((409.617706096, -74.48670365), (411.117706096, -74.570121508), (412.617706096, -74.48670365))
            Line((412.617706096, -74.48670365), (412.617706096, -79.283355939))
            ThreePointArc((412.617706096, -79.283355939), (411.117706096, -79.344925389), (409.617706096, -79.283355939))
            Line((409.617706096, -79.283355939), (409.617706096, -74.48670365))
        make_face()
        with BuildLine():
            ThreePointArc((397.605072146, -61.687313229), (397.641217284, -62.221852914), (397.698499686, -62.754542196))
            Line((397.698499686, -62.754542196), (399.698499686, -62.754542196))
            Line((399.698499686, -62.754542196), (399.698499686, -61.687313229))
            Line((399.698499686, -61.687313229), (397.605072146, -61.687313229))
        make_face()
    extrude(amount=-BOSS_EXTRUDE2_DEPTH)


solid = cut_extrude1_piece_1_1.part
